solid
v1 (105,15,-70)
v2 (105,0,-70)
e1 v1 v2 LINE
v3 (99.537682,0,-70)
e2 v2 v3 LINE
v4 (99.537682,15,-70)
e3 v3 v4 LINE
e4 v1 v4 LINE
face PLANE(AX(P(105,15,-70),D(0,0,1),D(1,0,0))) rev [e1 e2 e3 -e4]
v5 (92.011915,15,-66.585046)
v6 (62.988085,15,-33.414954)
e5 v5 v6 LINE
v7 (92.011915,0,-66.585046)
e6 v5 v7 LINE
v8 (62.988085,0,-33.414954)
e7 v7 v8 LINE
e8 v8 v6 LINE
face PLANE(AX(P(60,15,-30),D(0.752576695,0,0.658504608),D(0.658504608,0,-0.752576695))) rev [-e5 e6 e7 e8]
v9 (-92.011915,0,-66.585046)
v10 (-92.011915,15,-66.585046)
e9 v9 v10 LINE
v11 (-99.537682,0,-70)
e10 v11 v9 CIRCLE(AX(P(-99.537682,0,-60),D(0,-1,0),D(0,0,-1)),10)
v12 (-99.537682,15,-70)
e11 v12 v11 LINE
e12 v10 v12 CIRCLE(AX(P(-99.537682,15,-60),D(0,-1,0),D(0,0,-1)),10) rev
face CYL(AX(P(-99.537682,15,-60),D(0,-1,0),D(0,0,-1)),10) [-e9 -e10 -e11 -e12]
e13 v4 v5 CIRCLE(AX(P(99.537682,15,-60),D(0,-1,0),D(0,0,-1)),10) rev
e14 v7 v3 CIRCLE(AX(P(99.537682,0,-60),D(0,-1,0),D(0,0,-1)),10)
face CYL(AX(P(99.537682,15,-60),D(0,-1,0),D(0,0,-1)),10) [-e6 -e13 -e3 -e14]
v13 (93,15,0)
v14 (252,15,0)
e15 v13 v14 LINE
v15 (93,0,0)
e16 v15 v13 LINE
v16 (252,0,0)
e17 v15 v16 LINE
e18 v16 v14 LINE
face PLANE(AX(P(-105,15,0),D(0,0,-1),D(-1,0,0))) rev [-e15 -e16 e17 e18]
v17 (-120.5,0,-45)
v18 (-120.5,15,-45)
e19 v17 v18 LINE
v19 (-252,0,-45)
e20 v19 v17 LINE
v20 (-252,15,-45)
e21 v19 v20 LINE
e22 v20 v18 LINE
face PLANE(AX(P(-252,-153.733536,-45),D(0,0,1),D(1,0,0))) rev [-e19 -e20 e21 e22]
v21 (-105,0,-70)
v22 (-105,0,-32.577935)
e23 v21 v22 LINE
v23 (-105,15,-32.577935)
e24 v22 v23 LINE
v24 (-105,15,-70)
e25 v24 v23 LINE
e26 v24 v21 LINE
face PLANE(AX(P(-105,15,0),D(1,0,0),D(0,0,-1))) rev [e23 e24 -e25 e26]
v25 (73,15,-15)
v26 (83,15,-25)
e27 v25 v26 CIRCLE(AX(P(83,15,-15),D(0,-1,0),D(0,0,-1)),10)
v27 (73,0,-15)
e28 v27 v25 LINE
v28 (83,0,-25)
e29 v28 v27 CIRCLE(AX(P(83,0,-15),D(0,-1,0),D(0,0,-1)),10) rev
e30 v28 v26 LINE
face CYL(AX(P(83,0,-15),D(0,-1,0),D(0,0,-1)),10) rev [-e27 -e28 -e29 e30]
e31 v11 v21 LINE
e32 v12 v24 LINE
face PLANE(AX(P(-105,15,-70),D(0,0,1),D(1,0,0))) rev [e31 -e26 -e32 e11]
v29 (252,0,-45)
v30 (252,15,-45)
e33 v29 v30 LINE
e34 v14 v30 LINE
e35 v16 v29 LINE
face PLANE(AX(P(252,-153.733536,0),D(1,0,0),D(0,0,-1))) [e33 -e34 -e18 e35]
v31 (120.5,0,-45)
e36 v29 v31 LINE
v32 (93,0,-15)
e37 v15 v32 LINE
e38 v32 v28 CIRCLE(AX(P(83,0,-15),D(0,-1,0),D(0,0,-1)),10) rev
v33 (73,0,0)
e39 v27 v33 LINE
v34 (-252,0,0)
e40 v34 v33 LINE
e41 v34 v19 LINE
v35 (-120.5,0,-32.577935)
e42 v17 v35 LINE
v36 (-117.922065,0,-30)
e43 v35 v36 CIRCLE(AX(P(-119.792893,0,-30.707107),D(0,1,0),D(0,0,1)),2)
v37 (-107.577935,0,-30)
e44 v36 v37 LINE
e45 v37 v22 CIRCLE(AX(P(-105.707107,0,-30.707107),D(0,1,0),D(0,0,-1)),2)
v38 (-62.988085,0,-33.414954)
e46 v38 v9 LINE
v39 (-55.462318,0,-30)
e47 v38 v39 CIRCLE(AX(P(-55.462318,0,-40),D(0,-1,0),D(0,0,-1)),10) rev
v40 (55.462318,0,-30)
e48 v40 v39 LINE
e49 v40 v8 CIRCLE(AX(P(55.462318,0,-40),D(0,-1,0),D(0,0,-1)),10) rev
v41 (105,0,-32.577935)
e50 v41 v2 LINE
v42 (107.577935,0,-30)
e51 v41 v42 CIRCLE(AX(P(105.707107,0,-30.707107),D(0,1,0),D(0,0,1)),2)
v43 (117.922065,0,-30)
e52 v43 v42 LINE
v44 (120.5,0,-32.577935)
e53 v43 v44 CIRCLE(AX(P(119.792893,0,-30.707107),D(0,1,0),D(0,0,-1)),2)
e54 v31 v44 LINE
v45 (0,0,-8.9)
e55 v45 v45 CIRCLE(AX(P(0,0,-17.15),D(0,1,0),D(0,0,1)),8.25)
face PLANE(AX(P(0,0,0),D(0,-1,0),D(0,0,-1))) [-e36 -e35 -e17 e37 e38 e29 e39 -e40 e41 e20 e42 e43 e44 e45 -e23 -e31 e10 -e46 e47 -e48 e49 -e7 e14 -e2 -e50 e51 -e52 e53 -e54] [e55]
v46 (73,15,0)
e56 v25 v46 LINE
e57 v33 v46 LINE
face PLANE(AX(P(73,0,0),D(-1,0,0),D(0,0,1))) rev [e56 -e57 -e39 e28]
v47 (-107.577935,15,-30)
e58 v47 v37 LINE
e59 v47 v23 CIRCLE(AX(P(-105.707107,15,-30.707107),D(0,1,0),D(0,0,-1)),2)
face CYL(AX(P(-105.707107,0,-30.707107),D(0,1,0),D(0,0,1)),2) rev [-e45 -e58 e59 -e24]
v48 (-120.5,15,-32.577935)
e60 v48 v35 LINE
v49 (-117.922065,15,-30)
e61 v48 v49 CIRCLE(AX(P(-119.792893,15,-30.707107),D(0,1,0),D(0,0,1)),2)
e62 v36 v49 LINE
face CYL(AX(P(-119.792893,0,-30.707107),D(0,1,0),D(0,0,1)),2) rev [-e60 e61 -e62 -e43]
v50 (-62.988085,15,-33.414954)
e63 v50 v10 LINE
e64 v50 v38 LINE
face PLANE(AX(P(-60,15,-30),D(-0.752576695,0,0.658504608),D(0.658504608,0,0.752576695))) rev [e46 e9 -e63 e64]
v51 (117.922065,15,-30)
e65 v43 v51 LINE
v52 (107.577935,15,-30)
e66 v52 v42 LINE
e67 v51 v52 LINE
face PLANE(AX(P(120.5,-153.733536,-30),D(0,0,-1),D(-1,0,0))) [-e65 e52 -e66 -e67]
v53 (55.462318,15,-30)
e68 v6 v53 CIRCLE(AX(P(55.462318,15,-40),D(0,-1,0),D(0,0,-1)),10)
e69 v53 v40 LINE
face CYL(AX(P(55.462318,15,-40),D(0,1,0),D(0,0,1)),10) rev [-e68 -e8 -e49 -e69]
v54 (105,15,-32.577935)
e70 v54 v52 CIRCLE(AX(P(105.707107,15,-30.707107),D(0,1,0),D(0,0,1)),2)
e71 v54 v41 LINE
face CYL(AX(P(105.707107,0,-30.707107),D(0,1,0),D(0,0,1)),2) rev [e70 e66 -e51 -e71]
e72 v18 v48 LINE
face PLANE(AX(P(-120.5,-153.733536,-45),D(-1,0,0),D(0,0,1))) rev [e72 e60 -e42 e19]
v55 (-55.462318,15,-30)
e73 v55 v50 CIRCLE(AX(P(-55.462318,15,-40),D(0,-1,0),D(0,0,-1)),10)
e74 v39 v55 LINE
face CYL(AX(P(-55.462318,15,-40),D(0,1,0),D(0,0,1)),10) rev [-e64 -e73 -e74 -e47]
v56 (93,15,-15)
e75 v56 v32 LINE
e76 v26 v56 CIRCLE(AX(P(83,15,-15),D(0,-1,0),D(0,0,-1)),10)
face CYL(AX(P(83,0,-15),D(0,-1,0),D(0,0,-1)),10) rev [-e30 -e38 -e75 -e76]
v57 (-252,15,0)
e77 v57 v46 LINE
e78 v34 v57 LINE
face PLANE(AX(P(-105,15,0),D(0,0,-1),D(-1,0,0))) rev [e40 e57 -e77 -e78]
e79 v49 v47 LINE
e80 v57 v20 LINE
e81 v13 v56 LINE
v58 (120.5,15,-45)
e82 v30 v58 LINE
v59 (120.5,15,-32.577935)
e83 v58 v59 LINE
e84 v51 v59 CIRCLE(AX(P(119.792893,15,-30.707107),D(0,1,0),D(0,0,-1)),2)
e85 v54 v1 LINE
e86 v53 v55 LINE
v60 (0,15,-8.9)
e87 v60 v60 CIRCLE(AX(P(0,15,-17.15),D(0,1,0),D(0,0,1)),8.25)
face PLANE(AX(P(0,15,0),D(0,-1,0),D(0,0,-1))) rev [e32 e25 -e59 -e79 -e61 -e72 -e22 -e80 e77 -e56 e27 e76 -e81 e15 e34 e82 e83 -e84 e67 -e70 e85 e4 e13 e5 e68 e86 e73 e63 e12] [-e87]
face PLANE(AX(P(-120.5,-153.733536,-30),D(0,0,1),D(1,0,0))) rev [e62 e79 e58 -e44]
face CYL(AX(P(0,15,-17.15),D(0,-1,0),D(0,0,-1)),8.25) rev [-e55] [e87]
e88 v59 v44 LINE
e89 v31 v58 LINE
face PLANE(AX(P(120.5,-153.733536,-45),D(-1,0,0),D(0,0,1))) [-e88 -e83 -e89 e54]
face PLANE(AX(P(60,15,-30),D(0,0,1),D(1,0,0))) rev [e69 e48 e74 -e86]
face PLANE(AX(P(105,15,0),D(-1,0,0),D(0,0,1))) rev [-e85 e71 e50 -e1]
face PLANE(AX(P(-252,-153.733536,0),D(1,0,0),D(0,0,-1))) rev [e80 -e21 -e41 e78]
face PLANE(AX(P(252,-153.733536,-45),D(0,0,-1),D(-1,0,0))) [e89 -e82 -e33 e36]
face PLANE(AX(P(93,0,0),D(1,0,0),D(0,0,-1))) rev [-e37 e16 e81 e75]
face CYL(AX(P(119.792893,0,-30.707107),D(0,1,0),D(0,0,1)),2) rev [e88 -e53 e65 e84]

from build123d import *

# Parameters (mm, degrees)
SKETCH1_R           = 8.25
BOSS_EXTRUDE1_DEPTH = 15
FILLET1_R           = 10
BOSS_EXTRUDE2_DEPTH = 15
SKETCH3_W           = 20
SKETCH3_H           = 25
CUT_EXTRUDE1_DEPTH  = 262.971372482
FILLET2_R           = 10
SKETCH4_R           = 2
CUT_EXTRUDE2_DEPTH  = 262.971372482


with BuildPart() as part:
    # Sketch1 → Boss-Extrude1 (new body)
    with BuildSketch(Plane(origin=(0, 0, 0), x_dir=(1, 0, 0), z_dir=(0, 1, 0))):
        Polygon((-105, 0), (105, 0), (105, 70), (95, 70), (60, 30), (-60, 30), (-95, 70), (-105, 70), align=None)
        with Locations(Location((0, 17.15, 0), (0, 0, 270))):
            Circle(SKETCH1_R, mode=Mode.SUBTRACT)
    extrude(amount=BOSS_EXTRUDE1_DEPTH)

    # Fillet1
    fillet1_edges = [part.edges().sort_by_distance(p)[0] for p in [
        (-95, 7.5, -70),
        (-60, 7.5, -30),
        (60, 7.5, -30),
        (95, 7.5, -70),
    ]]
    fillet(fillet1_edges, radius=FILLET1_R)

    # Sketch2 → Boss-Extrude2 (add)
    with BuildSketch(Plane(origin=(0, 15, 0), x_dir=(1, 0, 0), z_dir=(0, 1, 0))):
        Polygon((105, 0), (252, 0), (252, 45), (120.5, 45), (120.5, 30), (105, 30), align=None)
    boss_extrude2 = extrude(amount=-BOSS_EXTRUDE2_DEPTH)

    # Mirror1: Boss-Extrude2 across plane
    add(boss_extrude2.mirror(Plane(origin=(0, 0, 0), x_dir=(0, 0, 1), z_dir=(1, 0, 0))))

    # Sketch3 → Cut-Extrude1 (cut, through all)
    with BuildSketch(Plane(origin=(0, 15, 0), x_dir=(1, 0, 0), z_dir=(0, 1, 0))):
        with Locations((83, 12.5)):
            Rectangle(SKETCH3_W, SKETCH3_H)
    extrude(amount=-CUT_EXTRUDE1_DEPTH, mode=Mode.SUBTRACT)

    # Fillet2
    fillet2_edges = [part.edges().sort_by_distance(p)[0] for p in [
        (73, 7.5, -25),
        (93, 7.5, -25),
    ]]
    fillet(fillet2_edges, radius=FILLET2_R - 0.0001)  # a hair under: the kernel refuses the full size

    # Sketch4 → Cut-Extrude2 (cut, through all)
    with BuildSketch(Plane(origin=(0, 15, 0), x_dir=(1, 0, 0), z_dir=(0, 1, 0))):
        with Locations((-119.792893219, 30.707106781)):
            Circle(SKETCH4_R)
        with Locations((-105.707106781, 30.707106781)):
            Circle(SKETCH4_R)
        with Locations((105.707106781, 30.707106781)):
            Circle(SKETCH4_R)
        with Locations((119.792893219, 30.707106781)):
            Circle(SKETCH4_R)
    extrude(amount=-CUT_EXTRUDE2_DEPTH, mode=Mode.SUBTRACT)


solid = part.part
